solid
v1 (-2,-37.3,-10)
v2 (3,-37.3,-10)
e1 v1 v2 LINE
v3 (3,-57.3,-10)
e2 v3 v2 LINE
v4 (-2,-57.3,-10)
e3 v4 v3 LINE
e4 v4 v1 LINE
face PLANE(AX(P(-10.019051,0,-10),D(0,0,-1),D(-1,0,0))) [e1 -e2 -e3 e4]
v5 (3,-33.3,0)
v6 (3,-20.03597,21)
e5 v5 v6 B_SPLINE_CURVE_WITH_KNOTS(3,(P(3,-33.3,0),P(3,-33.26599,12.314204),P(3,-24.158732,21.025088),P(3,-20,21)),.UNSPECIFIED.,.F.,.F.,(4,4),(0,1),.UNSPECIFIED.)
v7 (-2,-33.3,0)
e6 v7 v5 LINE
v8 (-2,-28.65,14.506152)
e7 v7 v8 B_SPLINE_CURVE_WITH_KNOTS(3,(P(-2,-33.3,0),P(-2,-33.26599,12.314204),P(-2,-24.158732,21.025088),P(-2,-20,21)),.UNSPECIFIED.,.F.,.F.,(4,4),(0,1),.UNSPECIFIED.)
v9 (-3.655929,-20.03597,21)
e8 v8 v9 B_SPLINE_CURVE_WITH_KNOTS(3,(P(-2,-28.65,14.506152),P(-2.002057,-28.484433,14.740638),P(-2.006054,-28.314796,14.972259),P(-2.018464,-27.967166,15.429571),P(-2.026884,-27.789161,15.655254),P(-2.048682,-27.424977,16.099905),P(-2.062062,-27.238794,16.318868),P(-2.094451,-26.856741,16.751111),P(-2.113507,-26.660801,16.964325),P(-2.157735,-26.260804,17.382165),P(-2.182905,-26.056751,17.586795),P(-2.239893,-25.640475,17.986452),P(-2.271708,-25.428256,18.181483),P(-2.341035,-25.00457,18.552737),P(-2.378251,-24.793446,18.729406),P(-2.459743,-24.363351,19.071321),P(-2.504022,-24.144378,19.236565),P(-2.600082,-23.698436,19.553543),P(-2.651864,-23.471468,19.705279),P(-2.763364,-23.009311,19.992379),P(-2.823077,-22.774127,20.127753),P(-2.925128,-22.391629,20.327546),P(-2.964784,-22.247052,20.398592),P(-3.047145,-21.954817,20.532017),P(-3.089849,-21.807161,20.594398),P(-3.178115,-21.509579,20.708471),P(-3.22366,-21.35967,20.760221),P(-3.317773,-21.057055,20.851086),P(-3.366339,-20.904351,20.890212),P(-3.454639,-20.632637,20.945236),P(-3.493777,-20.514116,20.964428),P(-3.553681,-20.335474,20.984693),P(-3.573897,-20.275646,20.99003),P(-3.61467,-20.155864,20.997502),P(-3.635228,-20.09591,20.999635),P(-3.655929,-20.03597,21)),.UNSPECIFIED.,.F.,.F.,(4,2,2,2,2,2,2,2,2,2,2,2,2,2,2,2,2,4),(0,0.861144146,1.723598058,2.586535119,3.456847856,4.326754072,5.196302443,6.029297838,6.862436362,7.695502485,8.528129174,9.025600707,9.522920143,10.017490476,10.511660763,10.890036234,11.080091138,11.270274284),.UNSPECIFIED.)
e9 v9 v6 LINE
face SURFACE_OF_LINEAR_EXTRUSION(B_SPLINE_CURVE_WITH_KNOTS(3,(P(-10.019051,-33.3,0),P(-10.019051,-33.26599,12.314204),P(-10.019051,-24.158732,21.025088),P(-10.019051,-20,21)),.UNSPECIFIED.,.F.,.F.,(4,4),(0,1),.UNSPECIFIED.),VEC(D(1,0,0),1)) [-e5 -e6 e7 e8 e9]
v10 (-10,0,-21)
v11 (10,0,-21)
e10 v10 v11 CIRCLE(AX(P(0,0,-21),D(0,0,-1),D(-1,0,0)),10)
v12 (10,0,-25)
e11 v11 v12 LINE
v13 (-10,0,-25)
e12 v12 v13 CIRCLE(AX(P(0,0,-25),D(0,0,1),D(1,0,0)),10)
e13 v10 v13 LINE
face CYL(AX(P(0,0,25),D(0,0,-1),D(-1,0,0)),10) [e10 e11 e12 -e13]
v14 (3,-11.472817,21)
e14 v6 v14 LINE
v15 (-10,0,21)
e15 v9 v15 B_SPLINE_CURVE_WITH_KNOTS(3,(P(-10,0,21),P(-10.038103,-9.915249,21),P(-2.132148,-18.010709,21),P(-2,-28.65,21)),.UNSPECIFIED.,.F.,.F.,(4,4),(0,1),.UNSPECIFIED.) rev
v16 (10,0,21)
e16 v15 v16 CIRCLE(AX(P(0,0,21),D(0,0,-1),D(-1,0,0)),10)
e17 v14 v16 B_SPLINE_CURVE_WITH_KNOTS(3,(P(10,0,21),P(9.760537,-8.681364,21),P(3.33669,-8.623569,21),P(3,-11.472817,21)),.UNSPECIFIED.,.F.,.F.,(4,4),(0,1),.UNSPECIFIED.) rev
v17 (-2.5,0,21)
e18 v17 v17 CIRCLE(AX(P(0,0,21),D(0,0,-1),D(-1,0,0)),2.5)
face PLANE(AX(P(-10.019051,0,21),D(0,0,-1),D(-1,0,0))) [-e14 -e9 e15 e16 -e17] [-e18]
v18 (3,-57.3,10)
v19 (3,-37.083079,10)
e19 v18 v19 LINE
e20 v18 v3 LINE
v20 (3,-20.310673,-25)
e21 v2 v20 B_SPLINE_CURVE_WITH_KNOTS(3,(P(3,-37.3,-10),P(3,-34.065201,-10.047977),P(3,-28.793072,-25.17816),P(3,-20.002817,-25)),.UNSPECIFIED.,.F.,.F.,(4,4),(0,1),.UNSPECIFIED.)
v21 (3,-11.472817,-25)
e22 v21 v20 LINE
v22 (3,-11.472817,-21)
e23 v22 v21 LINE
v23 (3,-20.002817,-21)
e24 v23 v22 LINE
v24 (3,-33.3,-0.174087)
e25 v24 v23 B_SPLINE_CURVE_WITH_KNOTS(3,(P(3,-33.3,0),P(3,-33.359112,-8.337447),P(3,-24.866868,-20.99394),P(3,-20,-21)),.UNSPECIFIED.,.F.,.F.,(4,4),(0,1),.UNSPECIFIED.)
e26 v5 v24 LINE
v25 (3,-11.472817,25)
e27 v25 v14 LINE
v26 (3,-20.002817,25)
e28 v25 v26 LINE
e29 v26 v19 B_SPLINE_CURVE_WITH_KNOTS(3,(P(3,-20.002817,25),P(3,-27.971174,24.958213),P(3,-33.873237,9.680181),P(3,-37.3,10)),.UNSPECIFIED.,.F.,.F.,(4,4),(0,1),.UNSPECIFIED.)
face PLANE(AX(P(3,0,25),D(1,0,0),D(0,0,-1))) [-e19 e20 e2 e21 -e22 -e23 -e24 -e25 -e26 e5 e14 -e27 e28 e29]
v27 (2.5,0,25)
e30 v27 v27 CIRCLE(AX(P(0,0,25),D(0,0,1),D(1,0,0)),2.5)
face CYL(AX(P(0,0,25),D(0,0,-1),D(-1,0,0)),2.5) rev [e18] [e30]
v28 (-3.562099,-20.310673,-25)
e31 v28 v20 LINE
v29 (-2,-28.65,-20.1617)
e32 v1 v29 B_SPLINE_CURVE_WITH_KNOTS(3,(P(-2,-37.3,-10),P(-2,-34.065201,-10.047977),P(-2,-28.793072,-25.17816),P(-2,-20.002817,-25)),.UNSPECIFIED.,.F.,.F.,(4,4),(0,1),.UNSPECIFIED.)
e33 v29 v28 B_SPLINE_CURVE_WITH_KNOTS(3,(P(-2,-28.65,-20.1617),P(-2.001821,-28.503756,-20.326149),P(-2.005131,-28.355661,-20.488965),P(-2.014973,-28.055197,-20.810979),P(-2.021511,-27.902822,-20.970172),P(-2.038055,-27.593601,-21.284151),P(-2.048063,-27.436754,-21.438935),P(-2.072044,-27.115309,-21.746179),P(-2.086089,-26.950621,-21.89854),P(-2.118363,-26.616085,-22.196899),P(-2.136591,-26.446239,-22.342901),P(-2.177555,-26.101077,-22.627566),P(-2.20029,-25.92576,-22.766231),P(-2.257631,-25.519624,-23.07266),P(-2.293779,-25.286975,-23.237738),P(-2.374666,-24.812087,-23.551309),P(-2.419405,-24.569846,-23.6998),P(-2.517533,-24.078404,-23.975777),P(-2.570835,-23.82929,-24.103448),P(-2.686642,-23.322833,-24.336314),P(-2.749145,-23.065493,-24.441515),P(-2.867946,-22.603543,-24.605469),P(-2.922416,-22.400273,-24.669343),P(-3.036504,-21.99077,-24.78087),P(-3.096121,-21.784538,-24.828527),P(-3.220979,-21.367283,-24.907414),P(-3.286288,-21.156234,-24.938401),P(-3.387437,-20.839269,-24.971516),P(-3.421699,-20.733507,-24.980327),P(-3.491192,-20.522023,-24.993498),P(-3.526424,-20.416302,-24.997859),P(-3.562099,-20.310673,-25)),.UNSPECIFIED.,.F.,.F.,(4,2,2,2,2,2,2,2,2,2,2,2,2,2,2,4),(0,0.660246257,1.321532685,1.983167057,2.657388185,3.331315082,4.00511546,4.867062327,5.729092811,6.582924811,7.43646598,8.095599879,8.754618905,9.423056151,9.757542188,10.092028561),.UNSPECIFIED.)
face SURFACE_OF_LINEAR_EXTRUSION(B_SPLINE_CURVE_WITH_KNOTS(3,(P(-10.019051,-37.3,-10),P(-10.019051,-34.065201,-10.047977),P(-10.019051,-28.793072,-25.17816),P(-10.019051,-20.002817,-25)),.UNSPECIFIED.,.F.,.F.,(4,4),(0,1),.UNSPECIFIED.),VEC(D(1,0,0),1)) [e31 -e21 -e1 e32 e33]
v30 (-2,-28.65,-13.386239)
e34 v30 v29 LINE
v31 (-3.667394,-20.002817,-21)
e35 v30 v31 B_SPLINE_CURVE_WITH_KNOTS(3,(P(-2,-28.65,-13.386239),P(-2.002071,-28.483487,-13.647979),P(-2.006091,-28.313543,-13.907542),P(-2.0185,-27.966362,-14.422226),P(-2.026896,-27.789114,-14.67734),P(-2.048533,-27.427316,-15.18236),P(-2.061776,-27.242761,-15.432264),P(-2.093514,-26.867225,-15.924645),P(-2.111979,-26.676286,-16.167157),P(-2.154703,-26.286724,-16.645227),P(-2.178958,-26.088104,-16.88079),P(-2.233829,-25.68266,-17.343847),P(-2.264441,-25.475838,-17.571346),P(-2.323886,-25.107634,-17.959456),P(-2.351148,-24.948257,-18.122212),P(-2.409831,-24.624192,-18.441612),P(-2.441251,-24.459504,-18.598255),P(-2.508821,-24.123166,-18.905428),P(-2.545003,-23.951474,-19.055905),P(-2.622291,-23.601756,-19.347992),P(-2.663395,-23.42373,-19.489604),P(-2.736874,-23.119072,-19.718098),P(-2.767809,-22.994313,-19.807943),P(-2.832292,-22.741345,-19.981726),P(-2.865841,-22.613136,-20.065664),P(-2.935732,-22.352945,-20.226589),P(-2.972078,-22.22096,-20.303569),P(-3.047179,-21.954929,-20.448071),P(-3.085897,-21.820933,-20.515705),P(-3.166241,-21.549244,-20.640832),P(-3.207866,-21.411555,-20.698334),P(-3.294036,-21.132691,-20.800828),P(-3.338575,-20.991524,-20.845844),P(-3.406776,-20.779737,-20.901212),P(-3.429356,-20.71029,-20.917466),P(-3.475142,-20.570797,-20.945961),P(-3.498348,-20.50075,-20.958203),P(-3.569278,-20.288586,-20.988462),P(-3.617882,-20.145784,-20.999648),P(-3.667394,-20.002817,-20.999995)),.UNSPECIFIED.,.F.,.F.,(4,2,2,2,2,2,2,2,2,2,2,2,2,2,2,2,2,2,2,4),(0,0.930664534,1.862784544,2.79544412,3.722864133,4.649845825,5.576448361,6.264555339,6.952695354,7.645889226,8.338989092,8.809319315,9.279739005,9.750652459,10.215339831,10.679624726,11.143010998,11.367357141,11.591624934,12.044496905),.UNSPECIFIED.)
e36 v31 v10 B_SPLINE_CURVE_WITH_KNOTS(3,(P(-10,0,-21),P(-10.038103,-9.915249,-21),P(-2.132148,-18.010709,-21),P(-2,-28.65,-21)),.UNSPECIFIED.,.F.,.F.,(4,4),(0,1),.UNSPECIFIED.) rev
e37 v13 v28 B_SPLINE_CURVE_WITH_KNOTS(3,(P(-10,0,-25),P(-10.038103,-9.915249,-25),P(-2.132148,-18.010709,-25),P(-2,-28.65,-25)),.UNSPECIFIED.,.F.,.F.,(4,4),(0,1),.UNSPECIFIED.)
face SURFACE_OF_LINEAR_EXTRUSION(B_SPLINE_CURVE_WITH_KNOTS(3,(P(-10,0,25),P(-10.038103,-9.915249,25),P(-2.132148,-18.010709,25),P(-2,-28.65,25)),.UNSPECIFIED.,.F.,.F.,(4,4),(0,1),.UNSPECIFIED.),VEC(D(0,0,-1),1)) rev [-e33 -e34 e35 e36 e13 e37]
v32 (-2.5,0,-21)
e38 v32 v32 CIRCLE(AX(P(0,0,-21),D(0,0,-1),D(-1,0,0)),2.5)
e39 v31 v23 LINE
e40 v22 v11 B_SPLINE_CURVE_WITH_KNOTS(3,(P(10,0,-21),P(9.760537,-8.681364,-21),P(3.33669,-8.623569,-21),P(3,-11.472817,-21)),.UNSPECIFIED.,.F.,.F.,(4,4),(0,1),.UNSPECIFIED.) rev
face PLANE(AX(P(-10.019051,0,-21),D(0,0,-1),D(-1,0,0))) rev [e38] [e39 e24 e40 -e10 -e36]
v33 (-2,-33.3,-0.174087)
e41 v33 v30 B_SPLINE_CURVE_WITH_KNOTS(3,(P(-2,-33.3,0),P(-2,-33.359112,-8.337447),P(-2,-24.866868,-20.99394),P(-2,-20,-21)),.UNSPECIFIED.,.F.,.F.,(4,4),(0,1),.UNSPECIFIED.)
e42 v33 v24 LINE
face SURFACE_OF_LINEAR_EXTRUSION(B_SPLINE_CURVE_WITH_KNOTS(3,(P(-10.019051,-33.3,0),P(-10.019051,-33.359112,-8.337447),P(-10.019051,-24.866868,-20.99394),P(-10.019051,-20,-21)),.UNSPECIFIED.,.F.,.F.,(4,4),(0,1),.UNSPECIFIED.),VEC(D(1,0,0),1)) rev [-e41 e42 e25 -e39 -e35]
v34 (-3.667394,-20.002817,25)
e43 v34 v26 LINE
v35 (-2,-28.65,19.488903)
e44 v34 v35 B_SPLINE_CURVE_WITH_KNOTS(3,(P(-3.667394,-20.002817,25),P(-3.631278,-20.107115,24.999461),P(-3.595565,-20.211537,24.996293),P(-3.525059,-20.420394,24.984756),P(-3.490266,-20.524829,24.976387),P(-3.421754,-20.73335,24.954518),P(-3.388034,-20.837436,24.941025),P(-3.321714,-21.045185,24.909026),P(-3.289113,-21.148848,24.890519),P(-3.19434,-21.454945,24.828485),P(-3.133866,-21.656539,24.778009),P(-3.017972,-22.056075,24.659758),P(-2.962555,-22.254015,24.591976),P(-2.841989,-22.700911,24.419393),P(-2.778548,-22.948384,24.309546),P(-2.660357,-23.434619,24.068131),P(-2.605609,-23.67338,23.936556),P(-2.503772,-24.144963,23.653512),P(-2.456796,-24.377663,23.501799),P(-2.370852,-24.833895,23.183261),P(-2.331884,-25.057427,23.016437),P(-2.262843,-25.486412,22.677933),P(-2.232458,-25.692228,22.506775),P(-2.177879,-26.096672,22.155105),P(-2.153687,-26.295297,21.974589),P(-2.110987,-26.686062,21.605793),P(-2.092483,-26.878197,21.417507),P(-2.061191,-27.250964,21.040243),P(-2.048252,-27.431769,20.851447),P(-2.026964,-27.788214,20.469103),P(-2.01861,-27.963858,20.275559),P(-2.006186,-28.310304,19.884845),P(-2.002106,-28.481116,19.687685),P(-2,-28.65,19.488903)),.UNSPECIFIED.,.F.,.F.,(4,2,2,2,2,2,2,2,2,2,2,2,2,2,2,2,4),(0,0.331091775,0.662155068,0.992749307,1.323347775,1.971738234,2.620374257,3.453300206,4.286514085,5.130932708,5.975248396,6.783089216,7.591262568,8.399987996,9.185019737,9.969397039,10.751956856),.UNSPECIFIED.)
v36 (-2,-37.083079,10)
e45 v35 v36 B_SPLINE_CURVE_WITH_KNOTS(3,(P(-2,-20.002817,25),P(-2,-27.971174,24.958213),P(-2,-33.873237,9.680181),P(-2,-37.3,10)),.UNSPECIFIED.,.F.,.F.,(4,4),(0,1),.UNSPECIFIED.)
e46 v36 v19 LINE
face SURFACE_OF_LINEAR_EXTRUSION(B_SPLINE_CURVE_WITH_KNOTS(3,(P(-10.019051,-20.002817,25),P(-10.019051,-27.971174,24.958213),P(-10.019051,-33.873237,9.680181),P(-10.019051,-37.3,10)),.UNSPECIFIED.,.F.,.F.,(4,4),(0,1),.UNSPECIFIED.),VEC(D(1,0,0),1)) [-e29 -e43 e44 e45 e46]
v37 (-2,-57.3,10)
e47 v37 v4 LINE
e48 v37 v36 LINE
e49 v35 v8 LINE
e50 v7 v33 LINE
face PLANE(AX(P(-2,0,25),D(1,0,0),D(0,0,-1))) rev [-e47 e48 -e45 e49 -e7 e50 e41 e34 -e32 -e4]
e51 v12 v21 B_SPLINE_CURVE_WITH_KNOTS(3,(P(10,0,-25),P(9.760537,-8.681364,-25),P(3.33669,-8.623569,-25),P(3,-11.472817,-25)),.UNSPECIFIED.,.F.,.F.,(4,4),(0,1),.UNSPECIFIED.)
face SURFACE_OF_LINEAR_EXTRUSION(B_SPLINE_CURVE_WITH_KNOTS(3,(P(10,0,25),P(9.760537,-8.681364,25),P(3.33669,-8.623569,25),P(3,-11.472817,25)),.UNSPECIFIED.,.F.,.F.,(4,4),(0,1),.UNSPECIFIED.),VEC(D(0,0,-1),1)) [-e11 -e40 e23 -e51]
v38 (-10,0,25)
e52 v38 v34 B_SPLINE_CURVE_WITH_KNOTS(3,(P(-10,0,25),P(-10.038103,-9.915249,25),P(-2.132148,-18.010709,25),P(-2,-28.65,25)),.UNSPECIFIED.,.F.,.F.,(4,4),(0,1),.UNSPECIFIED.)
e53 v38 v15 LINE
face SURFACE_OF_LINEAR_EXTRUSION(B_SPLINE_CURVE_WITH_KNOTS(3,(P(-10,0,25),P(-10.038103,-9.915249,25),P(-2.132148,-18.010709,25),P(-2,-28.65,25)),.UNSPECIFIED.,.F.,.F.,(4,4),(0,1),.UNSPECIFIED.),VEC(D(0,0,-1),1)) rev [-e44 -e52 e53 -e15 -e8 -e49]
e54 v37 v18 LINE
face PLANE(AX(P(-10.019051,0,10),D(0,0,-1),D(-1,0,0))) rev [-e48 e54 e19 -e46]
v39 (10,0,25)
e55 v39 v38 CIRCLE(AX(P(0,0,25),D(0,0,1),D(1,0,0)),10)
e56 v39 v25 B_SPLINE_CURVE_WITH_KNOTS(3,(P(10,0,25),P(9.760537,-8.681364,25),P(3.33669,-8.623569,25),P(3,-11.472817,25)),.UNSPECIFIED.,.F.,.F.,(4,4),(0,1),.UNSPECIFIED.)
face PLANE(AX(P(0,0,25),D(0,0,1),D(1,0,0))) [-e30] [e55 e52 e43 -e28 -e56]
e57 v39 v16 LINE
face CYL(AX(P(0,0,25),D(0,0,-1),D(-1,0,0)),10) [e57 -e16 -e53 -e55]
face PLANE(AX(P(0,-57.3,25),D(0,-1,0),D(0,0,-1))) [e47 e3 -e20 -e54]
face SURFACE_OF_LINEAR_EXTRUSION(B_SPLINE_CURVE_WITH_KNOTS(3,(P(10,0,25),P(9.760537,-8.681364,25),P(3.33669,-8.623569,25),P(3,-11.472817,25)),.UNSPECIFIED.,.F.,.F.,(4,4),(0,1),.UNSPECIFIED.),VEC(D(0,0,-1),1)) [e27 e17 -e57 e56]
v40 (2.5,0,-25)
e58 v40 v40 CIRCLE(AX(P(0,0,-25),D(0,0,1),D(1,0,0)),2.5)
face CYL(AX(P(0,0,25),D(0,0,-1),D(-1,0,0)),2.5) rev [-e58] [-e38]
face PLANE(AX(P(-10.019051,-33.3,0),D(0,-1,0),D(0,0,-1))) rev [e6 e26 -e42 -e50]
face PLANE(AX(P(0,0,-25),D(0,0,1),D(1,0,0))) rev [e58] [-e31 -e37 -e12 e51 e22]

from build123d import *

# Parameters (mm, degrees)
BOSS_EXTRU_1_DEPTH      = 50
ENL_V_START             = -13.000137383
ENL_V_MAT_EXTRU_1_DEPTH = 20.000137383


# Read off the part's stored shape, not the designer's step: Enlèv. mat.-Extru.1
with BuildPart() as part:
    # Esquisse1 → Boss.-Extru.1 (new body)
    with BuildSketch(Plane.XY.offset(-25)):
        with BuildLine():
            Line((-2, -28.65), (-2, -9.797958971))
            ThreePointArc((-2, -9.797958971), (-7.745966692, -6.32455532), (-10, 0))
            add(Edge.make_bspline(
                [(-10, 0), (-10.038102543, -9.915248827), (-2.132148039, -18.010708935), (-2, -28.65)],
                knots=[0, 0, 0, 0, 1, 1, 1, 1], degree=3))
        make_face()
        with BuildLine():
            Line((3, -11.472816521), (3, -9.539392014))
            ThreePointArc((3, -9.539392014), (0.516443819, -9.986655385), (-2, -9.797958971))
            Line((-2, -9.797958971), (-2, -28.65))
            Line((-2, -28.65), (-2, -57.3))
            Line((-2, -57.3), (3, -57.3))
            Line((3, -57.3), (3, -11.472816521))
        make_face()
        with BuildLine():
            ThreePointArc((9.899806533, -1.412030667), (7.623303271, -6.471881275), (3, -9.539392014))
            Line((3, -9.539392014), (3, -11.472816521))
            add(Edge.make_bspline(
                [(9.899806533, -1.412030667), (9.042464712, -8.684319248), (3.317345852, -8.787272714), (3, -11.472816521)],
                knots=[0.05745519, 0.05745519, 0.05745519, 0.05745519, 1, 1, 1, 1], degree=3))
        make_face()
        with BuildLine():
            ThreePointArc((-2, -1.5), (-0.790569415, 2.371708245), (2.5, 0))
            Line((2.5, 0), (3, 0))
            Line((3, 0), (3, -9.539392014))
            ThreePointArc((3, -9.539392014), (7.623303271, -6.471881275), (9.899806533, -1.412030667))
            add(Edge.make_bspline(
                [(10, 0), (9.986241611, -0.498789425), (9.952067961, -0.968730021), (9.899806533, -1.412030667)],
                knots=[0, 0, 0, 0, 0.05745519, 0.05745519, 0.05745519, 0.05745519], degree=3))
            ThreePointArc((10, 0), (0, 10), (-10, 0))
            ThreePointArc((-10, 0), (-7.745966692, -6.32455532), (-2, -9.797958971))
            Line((-2, -9.797958971), (-2, -1.5))
        make_face()
        with BuildLine():
            Line((3, 0), (2.5, 0))
            ThreePointArc((2.5, 0), (0.790569415, -2.371708245), (-2, -1.5))
            Line((-2, -1.5), (-2, -9.797958971))
            ThreePointArc((-2, -9.797958971), (0.516443819, -9.986655385), (3, -9.539392014))
            Line((3, -9.539392014), (3, 0))
        make_face()
    extrude(amount=BOSS_EXTRU_1_DEPTH)

    # Enlèv. mat.-Extru.1 outline → Enlèv. mat.-Extru.1 (cut)
    with BuildSketch(Plane(origin=(3, 0, 0), x_dir=(0, 0, -1), z_dir=(1, 0, 0)).offset(ENL_V_START)):
        with BuildLine():
            Line((-25, -57.3), (-10, -57.3))
            Line((-10, -57.3), (-10, -37.083079187))
            add(Edge.make_bspline(
                [(-10, -37.083079187), (-10.308820918, -33.626949696), (-24.959081539, -27.805521116), (-25, -20.002816521)],
                knots=[0.33438903, 0.33438903, 0.33438903, 0.33438903, 1.313600201, 1.313600201, 1.313600201, 1.313600201], degree=3))
            Line((-25, -20.002816521), (-25, -57.3))
        make_face()
        with BuildLine():
            Line((10, -37.3), (10, -57.3))
            Line((10, -57.3), (25, -57.3))
            Line((25, -57.3), (25, -20.310673404))
            add(Edge.make_bspline(
                [(25, -20.310673404), (24.825306853, -28.916467162), (10.047414043, -34.103142781), (10, -37.3)],
                knots=[0.656671032, 0.656671032, 0.656671032, 0.656671032, 1.644941889, 1.644941889, 1.644941889, 1.644941889], degree=3))
        make_face()
        with BuildLine():
            add(Edge.make_bspline(
                [(0.174087167, -33.300000001), (8.510773732, -33.241503729), (20.989133498, -24.836380481), (20.999995082, -20.00281651)],
                knots=[0.00693536, 0.00693536, 0.00693536, 0.00693536, 0.999807124, 0.999807124, 0.999807124, 0.999807124], degree=3))
            Line((20.999995082, -20.00281651), (21, 10.000000033))
            Line((21, 10.000000033), (-21, 10))
            Line((-21, 10), (-21.000000005, -20.035970331))
            add(Edge.make_bspline(
                [(0, -33.3), (-12.278821067, -33.266087617), (-20.974999639, -24.210992728), (-21.000000005, -20.035970331)],
                knots=[0, 0, 0, 0, 0.99712668, 0.99712668, 0.99712668, 0.99712668], degree=3))
            Line((0, -33.3), (0.174087167, -33.300000001))
        make_face()
    extrude(amount=ENL_V_MAT_EXTRU_1_DEPTH, mode=Mode.SUBTRACT)


solid = part.part
